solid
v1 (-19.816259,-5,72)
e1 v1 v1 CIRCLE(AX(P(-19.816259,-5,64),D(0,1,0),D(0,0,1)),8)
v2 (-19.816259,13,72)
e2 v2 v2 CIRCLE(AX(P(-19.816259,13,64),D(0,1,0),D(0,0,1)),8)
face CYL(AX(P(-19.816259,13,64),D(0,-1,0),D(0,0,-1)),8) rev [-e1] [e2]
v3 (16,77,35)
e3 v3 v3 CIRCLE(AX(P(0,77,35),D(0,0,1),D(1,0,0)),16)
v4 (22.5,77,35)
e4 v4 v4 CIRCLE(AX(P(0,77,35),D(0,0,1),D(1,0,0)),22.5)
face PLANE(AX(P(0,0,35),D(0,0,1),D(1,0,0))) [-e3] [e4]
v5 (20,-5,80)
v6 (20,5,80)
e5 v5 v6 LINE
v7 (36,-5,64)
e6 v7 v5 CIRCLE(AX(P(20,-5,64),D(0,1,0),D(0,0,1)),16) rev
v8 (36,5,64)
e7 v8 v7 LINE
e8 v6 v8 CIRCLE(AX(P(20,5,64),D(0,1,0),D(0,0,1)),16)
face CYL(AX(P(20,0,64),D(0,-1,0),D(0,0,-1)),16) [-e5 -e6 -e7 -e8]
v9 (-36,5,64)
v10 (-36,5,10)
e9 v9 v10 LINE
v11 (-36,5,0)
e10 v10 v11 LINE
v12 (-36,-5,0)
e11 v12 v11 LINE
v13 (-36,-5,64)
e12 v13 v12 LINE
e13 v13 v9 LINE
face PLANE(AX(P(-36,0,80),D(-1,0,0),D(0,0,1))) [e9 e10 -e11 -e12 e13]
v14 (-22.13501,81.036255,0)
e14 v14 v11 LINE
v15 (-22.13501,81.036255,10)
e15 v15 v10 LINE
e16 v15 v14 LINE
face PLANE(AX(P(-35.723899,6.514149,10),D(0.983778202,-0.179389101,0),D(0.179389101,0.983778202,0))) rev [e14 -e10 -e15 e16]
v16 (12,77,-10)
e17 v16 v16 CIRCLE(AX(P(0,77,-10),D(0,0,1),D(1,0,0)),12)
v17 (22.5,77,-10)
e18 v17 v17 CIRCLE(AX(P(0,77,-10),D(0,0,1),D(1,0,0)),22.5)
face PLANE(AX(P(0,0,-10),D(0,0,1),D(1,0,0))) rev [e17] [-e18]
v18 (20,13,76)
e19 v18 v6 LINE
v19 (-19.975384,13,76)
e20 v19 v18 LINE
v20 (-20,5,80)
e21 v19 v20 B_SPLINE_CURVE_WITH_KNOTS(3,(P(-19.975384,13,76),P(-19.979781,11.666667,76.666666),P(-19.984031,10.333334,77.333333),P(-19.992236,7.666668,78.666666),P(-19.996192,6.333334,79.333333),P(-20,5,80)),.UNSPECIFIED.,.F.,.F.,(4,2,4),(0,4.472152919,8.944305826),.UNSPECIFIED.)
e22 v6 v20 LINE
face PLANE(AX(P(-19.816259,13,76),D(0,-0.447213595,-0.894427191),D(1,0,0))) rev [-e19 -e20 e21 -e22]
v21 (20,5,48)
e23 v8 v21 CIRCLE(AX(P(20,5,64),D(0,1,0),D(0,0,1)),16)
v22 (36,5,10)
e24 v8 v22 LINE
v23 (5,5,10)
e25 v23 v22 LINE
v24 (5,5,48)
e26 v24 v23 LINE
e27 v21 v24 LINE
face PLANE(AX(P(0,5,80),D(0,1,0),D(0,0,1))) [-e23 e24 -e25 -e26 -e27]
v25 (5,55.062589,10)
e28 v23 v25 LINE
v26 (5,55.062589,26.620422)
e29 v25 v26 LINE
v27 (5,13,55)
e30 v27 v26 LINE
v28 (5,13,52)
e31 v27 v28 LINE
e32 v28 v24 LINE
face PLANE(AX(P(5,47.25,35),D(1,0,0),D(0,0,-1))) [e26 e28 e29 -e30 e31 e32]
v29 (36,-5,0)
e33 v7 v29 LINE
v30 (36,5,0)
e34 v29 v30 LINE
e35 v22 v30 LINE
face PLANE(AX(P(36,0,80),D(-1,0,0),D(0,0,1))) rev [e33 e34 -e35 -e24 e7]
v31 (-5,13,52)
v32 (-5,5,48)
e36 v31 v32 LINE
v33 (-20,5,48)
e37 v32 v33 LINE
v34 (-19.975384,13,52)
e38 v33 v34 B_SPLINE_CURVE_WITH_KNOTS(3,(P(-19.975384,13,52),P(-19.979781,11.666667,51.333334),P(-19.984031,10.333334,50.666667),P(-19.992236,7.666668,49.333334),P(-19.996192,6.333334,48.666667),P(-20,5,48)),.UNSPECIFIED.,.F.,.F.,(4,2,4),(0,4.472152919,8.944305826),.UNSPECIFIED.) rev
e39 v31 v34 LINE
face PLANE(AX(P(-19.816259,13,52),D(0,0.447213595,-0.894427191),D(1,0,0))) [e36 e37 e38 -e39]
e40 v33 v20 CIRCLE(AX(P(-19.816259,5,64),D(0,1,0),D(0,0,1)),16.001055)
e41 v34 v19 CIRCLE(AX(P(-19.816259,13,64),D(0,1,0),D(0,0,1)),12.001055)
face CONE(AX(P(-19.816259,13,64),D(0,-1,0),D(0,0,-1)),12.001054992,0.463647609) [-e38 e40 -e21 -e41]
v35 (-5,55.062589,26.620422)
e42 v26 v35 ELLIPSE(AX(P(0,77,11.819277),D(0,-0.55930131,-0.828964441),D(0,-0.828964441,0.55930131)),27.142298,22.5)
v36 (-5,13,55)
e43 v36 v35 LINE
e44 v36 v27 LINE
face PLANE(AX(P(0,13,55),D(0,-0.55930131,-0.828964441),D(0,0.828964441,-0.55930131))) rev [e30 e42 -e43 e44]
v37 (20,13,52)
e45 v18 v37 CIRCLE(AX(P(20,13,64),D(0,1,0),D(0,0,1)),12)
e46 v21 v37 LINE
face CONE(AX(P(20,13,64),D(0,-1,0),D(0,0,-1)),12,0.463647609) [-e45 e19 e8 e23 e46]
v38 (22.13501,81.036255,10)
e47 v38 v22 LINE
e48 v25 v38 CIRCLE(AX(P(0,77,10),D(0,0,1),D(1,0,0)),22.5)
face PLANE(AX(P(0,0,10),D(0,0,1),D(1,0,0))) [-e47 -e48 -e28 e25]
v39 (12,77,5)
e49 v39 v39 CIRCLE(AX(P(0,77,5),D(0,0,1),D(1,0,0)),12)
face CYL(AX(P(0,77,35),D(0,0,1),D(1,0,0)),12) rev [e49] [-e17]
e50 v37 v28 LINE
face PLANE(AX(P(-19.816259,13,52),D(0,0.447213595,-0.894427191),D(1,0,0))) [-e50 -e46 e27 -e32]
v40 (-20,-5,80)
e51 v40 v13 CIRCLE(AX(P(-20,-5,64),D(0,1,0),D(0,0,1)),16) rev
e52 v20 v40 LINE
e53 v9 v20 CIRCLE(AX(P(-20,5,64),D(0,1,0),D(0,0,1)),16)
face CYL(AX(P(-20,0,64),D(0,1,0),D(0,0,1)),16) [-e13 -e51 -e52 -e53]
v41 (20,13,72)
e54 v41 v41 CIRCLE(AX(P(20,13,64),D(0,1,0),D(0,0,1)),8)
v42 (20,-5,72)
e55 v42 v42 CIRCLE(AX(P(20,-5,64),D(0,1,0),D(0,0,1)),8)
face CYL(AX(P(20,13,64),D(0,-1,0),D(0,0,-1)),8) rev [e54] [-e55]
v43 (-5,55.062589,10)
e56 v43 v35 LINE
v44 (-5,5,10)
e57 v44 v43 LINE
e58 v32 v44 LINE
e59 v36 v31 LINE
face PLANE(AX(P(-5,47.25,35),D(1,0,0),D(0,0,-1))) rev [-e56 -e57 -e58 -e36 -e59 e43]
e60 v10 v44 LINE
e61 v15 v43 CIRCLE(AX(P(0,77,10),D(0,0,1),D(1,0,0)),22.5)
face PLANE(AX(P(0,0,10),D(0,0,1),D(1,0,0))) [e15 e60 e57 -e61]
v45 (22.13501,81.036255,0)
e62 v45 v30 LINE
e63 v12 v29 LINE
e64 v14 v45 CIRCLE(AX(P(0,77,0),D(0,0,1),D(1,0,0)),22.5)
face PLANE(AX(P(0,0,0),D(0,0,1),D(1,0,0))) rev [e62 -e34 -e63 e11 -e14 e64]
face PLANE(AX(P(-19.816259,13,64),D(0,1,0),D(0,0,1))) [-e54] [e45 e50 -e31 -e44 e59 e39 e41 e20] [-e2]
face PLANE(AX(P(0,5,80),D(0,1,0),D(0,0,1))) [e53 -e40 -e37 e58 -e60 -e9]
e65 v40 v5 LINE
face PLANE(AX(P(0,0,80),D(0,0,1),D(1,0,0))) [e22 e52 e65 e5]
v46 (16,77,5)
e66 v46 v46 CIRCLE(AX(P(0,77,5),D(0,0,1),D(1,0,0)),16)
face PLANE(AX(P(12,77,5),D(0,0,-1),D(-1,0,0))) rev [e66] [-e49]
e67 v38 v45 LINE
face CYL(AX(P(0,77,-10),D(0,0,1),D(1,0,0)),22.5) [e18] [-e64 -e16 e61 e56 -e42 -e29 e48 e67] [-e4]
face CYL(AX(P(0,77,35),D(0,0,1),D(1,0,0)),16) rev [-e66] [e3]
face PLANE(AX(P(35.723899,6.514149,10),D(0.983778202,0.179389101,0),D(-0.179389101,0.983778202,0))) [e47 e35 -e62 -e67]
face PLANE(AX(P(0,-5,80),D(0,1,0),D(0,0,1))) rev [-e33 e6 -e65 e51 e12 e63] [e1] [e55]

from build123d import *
from OCP.BRepFilletAPI import BRepFilletAPI_MakeChamfer

# Parameters (mm, degrees)
SKETCH1_W                               = 72
SKETCH1_H                               = 10
BOSS_EXTRUDE1_DEPTH                     = 80
BOSS_EXTRUDE2_DEPTH                     = 10
BOSS_EXTRUDE3_DEPTH                     = 35
BOSS_EXTRUDE3_DEPTH_BACK                = 10
SKETCH1_4_R                             = 22.5
SKETCH2_R                               = 8
BOSS_EXTRUDE4_DEPTH                     = 8
FILLET1_R                               = 16
CHAMFER4_SIZE                           = 8
CHAMFER4_SIZE_2                         = 4
SKETCH2_3_R                             = 8
CUT_EXTRUDE2_DEPTH                      = 129.942816783
RIB1_REACH                              = 134.651
SKETCH3_WALL_W                          = 317.36417602
SKETCH3_WALL_H                          = 10
CBORE_FOR_M5_HEX_HEAD_BOLT1_D           = 24
CBORE_FOR_M5_HEX_HEAD_BOLT1_DEPTH       = 45
CBORE_FOR_M5_HEX_HEAD_BOLT1_CBORE_D     = 32
CBORE_FOR_M5_HEX_HEAD_BOLT1_CBORE_DEPTH = 30
CBORE_FOR_M5_HEX_HEAD_BOLT1_TIP         = 6.92820323


with BuildPart() as part:
    # Sketch1 → Boss-Extrude1 (new body)
    with BuildSketch(Plane.XY):
        Rectangle(SKETCH1_W, SKETCH1_H)
    extrude(amount=BOSS_EXTRUDE1_DEPTH)

    # Sketch1<3> → Boss-Extrude2 (add)
    with BuildSketch(Plane.XY):
        with BuildLine():
            Line((-22.135009542, 81.036254771), (-36, 5))
            Line((-36, 5), (36, 5))
            Line((36, 5), (22.135009542, 81.036254771))
            ThreePointArc((22.135009542, 81.036254771), (22.408566606, 79.026361925), (22.5, 77))
            ThreePointArc((22.5, 77), (-2.026361925, 54.591433394), (-22.135009542, 81.036254771))
        make_face()
    extrude(amount=BOSS_EXTRUDE2_DEPTH)

    # Sketch1<4> → Boss-Extrude3 (add, two sides: drawn at the far end of the back side and taken through both)
    with BuildSketch(Plane.XY.offset(-BOSS_EXTRUDE3_DEPTH_BACK)):
        with Locations((0, 77)):
            Circle(SKETCH1_4_R)
    extrude(amount=BOSS_EXTRUDE3_DEPTH + BOSS_EXTRUDE3_DEPTH_BACK)

    # Sketch2 → Boss-Extrude4 (add)
    with BuildSketch(Plane(origin=(0, 5, 0), x_dir=(1, 0, 0), z_dir=(0, 1, 0))):
        with BuildLine():
            Line((-20, -80), (20, -80))
            ThreePointArc((20, -80), (36, -64), (20, -48))
            Line((20, -48), (-20, -48))
            ThreePointArc((-20, -48), (-35.817313754, -64), (-20, -80))
        make_face()
        with Locations(Location((20, -64, 0), (0, 0, 270))):
            Circle(SKETCH2_R, mode=Mode.SUBTRACT)
        with Locations(Location((-19.816258763, -64, 0), (0, 0, 270))):
            Circle(SKETCH2_R, mode=Mode.SUBTRACT)
    extrude(amount=BOSS_EXTRUDE4_DEPTH)

    # Fillet1
    fillet1_edges = [part.edges().sort_by_distance(p)[0] for p in [
        (-36, 0, 80),
        (36, 0, 80),
    ]]
    fillet(fillet1_edges, radius=FILLET1_R)

    # Chamfer4
    chamfer4_edges_1 = [part.edges().sort_by_distance(p)[0] for p in [
        (36, 13, 64),
    ]]
    chamfer4_side_1 = [part.faces().sort_by_distance(p)[0] for p in [
        (36, 12.92, 64),
    ]]
    chamfer4_edges_2 = [part.edges().sort_by_distance(p)[0] for p in [
        (0, 13, 48),
    ]]
    chamfer4_side_2 = [part.faces().sort_by_distance(p)[0] for p in [
        (0, 12.92, 48),
    ]]
    chamfer4_edges_3 = [part.edges().sort_by_distance(p)[0] for p in [
        (-35.817313754, 13, 64),
    ]]
    chamfer4_side_3 = [part.faces().sort_by_distance(p)[0] for p in [
        (-35.817313754, 12.92, 64),
    ]]
    chamfer4_edges_4 = [part.edges().sort_by_distance(p)[0] for p in [
        (0, 13, 80),
    ]]
    chamfer4_side_4 = [part.faces().sort_by_distance(p)[0] for p in [
        (0, 12.92, 80),
    ]]
    chamfer4 = BRepFilletAPI_MakeChamfer(part.part.solid().wrapped)
    for e in chamfer4_edges_1:
        chamfer4.Add(CHAMFER4_SIZE - 0.0001, CHAMFER4_SIZE_2 - 0.0001, e.wrapped, chamfer4_side_1[0].wrapped)
    for e in chamfer4_edges_2:
        chamfer4.Add(CHAMFER4_SIZE - 0.0001, CHAMFER4_SIZE_2 - 0.0001, e.wrapped, chamfer4_side_2[0].wrapped)
    for e in chamfer4_edges_3:
        chamfer4.Add(CHAMFER4_SIZE - 0.0001, CHAMFER4_SIZE_2 - 0.0001, e.wrapped, chamfer4_side_3[0].wrapped)
    for e in chamfer4_edges_4:
        chamfer4.Add(CHAMFER4_SIZE - 0.0001, CHAMFER4_SIZE_2 - 0.0001, e.wrapped, chamfer4_side_4[0].wrapped)
    add(Compound.cast(chamfer4.Shape()), mode=Mode.REPLACE)  # a hair under: the kernel refuses the full size

    # Sketch2<3> → Cut-Extrude2 (cut, through all)
    with BuildSketch(Plane(origin=(0, 5, 0), x_dir=(1, 0, 0), z_dir=(0, 1, 0))):
        with Locations(Location((-19.816258763, -64, 0), (0, 0, 270))):
            Circle(SKETCH2_3_R)
        with Locations(Location((20, -64, 0), (0, 0, 270))):
            Circle(SKETCH2_3_R)
    extrude(amount=-CUT_EXTRUDE2_DEPTH, mode=Mode.SUBTRACT)

    # Sketch3 wall → Rib1 (add, up to next)
    with BuildSketch(Plane(origin=(0, 33.75, 41), x_dir=(0, 0.828964441269, -0.559301309772), z_dir=(0, 0.559301309772, 0.828964441269)), mode=Mode.PRIVATE) as rib1_sk1:
        Rectangle(SKETCH3_WALL_W, SKETCH3_WALL_H)
    rib1_tool1 = extrude(rib1_sk1.sketch, amount=-RIB1_REACH, mode=Mode.PRIVATE) - part.part
    add(rib1_tool1.solids().sort_by_distance((0, 33.75, 41))[0])

    # CBORE for M5 Hex Head Bolt1
    with Locations(Plane.XY.offset(35)):
        with Locations((0, 77)):
            CounterBoreHole(CBORE_FOR_M5_HEX_HEAD_BOLT1_D / 2, CBORE_FOR_M5_HEX_HEAD_BOLT1_CBORE_D / 2, CBORE_FOR_M5_HEX_HEAD_BOLT1_CBORE_DEPTH, depth=CBORE_FOR_M5_HEX_HEAD_BOLT1_DEPTH)
            with Locations((0, 0, -(CBORE_FOR_M5_HEX_HEAD_BOLT1_DEPTH + CBORE_FOR_M5_HEX_HEAD_BOLT1_TIP / 2))):  # 120° drill point
                Cone(0, CBORE_FOR_M5_HEX_HEAD_BOLT1_D / 2, CBORE_FOR_M5_HEX_HEAD_BOLT1_TIP, mode=Mode.SUBTRACT)


solid = part.part
